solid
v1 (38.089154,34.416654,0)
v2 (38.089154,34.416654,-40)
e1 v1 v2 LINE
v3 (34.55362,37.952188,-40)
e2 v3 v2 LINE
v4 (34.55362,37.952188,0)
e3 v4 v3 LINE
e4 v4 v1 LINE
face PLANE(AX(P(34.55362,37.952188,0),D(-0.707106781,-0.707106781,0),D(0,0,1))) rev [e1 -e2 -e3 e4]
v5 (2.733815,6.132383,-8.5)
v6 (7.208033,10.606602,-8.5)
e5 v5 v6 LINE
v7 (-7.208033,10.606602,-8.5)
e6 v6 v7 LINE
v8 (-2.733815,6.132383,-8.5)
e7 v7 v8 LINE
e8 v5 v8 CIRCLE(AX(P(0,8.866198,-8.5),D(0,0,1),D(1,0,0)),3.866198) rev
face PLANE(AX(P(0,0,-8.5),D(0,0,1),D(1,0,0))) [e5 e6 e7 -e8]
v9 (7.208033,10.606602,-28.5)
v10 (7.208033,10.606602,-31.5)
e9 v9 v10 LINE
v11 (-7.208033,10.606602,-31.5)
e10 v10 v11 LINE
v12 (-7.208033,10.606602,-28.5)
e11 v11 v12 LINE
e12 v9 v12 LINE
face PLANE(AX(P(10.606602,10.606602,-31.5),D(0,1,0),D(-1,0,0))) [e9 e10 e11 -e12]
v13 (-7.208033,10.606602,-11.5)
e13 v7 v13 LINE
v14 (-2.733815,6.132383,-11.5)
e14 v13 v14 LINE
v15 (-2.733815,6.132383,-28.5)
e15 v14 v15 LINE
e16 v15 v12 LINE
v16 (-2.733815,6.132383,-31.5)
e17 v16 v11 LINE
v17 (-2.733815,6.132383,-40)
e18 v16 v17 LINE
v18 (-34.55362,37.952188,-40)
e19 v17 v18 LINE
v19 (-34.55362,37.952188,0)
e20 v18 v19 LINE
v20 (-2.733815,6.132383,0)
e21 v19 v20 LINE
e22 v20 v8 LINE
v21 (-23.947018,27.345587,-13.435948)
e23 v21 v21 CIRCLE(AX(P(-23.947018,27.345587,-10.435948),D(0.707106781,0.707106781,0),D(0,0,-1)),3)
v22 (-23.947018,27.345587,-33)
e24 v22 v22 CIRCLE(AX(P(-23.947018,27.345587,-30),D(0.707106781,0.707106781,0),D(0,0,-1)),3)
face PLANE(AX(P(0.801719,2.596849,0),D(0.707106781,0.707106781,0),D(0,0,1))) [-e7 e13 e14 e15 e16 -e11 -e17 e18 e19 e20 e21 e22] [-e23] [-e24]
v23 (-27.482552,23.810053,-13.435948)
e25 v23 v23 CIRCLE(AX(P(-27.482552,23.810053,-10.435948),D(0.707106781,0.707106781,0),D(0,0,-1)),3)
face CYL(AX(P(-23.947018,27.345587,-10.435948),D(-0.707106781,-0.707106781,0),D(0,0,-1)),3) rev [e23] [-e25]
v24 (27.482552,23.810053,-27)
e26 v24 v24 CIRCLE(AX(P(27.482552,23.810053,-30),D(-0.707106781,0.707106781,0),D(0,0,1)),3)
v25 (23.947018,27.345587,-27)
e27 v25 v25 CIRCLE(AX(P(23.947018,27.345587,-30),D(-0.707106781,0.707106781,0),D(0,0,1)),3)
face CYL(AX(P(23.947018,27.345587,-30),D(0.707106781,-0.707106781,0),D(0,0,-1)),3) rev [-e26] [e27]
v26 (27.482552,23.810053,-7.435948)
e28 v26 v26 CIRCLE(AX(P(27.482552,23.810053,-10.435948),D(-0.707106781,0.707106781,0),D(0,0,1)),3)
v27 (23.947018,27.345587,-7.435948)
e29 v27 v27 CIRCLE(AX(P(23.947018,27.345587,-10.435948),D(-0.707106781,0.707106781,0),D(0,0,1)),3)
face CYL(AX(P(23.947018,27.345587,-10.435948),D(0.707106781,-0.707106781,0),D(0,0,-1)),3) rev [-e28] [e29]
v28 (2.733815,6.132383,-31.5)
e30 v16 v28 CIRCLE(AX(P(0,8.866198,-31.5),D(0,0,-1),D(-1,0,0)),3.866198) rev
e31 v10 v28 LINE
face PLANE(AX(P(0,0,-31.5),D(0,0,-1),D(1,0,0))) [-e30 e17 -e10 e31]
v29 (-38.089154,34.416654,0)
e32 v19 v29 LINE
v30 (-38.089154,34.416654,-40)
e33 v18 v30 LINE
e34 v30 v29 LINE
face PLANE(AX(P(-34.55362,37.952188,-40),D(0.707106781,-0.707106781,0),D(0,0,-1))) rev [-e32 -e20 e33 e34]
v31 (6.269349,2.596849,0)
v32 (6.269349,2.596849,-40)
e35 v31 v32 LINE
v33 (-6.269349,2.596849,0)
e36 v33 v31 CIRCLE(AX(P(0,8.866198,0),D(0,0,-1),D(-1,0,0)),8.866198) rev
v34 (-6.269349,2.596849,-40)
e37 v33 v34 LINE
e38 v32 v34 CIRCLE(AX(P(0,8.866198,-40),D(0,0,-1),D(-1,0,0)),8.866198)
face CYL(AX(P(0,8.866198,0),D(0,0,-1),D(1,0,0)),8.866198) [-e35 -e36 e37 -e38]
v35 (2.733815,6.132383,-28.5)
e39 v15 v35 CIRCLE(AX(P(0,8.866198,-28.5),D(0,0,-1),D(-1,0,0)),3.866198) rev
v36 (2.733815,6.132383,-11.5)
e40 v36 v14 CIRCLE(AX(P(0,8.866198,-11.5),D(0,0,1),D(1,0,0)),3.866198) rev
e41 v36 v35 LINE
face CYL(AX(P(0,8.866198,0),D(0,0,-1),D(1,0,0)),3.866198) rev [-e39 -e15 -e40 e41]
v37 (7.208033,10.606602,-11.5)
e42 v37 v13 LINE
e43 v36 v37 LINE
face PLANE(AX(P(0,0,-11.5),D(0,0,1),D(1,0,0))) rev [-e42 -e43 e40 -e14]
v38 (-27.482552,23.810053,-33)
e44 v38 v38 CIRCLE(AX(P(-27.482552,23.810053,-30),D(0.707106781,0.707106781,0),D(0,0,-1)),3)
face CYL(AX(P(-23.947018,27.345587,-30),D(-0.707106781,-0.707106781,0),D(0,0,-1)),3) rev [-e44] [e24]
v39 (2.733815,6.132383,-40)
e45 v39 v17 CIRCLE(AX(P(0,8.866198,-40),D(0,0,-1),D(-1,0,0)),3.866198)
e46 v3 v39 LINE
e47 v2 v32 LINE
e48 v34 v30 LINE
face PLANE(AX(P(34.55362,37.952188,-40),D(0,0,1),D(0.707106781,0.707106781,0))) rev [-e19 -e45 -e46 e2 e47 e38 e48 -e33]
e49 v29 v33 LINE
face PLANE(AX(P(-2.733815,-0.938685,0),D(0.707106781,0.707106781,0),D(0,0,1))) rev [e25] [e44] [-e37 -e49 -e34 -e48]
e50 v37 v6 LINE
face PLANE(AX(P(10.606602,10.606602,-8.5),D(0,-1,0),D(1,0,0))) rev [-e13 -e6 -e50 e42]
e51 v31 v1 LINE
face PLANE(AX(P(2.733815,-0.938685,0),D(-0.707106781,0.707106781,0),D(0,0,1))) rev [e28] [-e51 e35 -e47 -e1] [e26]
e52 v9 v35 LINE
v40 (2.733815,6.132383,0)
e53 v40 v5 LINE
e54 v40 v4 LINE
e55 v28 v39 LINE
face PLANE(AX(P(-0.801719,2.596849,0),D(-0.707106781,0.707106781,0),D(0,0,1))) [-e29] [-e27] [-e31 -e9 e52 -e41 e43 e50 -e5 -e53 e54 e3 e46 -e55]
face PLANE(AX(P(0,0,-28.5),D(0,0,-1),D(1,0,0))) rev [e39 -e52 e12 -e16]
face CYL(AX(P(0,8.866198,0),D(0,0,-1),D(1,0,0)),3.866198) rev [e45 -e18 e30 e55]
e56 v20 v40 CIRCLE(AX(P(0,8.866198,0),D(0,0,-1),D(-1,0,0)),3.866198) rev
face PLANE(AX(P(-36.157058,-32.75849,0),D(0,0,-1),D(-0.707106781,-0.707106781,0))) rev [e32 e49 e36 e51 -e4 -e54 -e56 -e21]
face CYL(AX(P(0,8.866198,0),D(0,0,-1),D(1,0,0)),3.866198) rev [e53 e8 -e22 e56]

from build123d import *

# Parameters (mm, degrees)
SKETCH3_W           = 100
SKETCH3_H           = 40
SKETCH3_R           = 3
BOSS_EXTRUDE1_DEPTH = 5
FLEX1_START         = -36
FLEX1_OUTLINE_W     = 48.866197724
FLEX1_OUTLINE_H     = 40
FLEX1_DEPTH         = 33.40315081
FLEX1_START_2       = -2.59684919
FLEX1_2_OUTLINE_W   = 48.866197724
FLEX1_2_OUTLINE_H   = 40
FLEX1_2_OUTLINE_R   = 3
FLEX1_2_DEPTH       = 8.866197724
FLEX1_START_3       = 2.448182419
FLEX1_3_OUTLINE_W   = 5
FLEX1_3_OUTLINE_H   = 40
FLEX1_3_DEPTH       = 48.821166115
FLEX1_START_4       = -51.269348534
FLEX1_4_OUTLINE_W   = 3.866197724
FLEX1_4_OUTLINE_H   = 40
FLEX1_4_DEPTH       = 45
FLEX1_START_5       = 2.59684919
FLEX1_5_OUTLINE_R   = 3
FLEX1_5_OUTLINE_W   = 3.821166115
FLEX1_5_OUTLINE_H   = 40
FLEX1_5_DEPTH       = 33.40315081
FLEX1_START_6       = -2.40315081
FLEX1_6_OUTLINE_R   = 3
FLEX1_6_DEPTH       = 5
FLEX1_START_7       = 1.935784603
FLEX1_7_OUTLINE_W   = 0.045031609
FLEX1_7_OUTLINE_H   = 40
FLEX1_7_DEPTH       = 0.545856358
FLEX1_START_8       = -40
FLEX1_8_DEPTH       = 40
BOSS_EXTRUDE2_DEPTH = 1.5


with BuildPart() as part:
    # Sketch3 → Boss-Extrude1 (new body)
    with BuildSketch(Plane(origin=(0, 0, 0), x_dir=(1, 0, 0), z_dir=(0, 1, 0))):
        with Locations((0, 20)):
            Rectangle(SKETCH3_W, SKETCH3_H)
        with Locations(Location((35, 30, 0), (0, 0, 270))):
            Circle(SKETCH3_R, mode=Mode.SUBTRACT)
        with Locations(Location((35, 10.435948304, 0), (0, 0, 270))):
            Circle(SKETCH3_R, mode=Mode.SUBTRACT)
        with Locations(Location((-35, 10.435948304, 0), (0, 0, 90))):
            Circle(SKETCH3_R, mode=Mode.SUBTRACT)
        with Locations(Location((-35, 30, 0), (0, 0, 90))):
            Circle(SKETCH3_R, mode=Mode.SUBTRACT)
    extrude(amount=BOSS_EXTRUDE1_DEPTH)

    # Flex1: read off the stored shape, not the designer's step
    # Flex1 outline → Flex1 (cut)
    with BuildSketch(Plane(origin=(0, 0, 0), x_dir=(0.707106781186546, -0.707106781186549, 0), z_dir=(0.707106781186549, 0.707106781186546, 0)).offset(FLEX1_START)):
        with Locations((-26.836249672, 20)):
            Rectangle(FLEX1_OUTLINE_W, FLEX1_OUTLINE_H)
    extrude(amount=FLEX1_DEPTH, mode=Mode.SUBTRACT)

    # Flex1 2 outline → Flex1 2 (add)
    with BuildSketch(Plane(origin=(0, 0, 0), x_dir=(0.707106781186546, -0.707106781186549, 0), z_dir=(0.707106781186549, 0.707106781186546, 0)).offset(FLEX1_START_2)):
        with Locations((-26.836249672, 20)):
            Rectangle(FLEX1_2_OUTLINE_W, FLEX1_2_OUTLINE_H)
        with Locations((-36.269348534, 10.435948304)):
            Circle(FLEX1_2_OUTLINE_R, mode=Mode.SUBTRACT)
        with Locations((-36.269348534, 30)):
            Circle(FLEX1_2_OUTLINE_R, mode=Mode.SUBTRACT)
    extrude(amount=FLEX1_2_DEPTH)

    # Flex1 3 outline → Flex1 3 (add)
    with BuildSketch(Plane(origin=(0, 0, 0), x_dir=(0.707106781186546, -0.707106781186549, 0), z_dir=(0.707106781186549, 0.707106781186546, 0)).offset(FLEX1_START_3)):
        with Locations((0.09684919, 20)):
            Rectangle(FLEX1_3_OUTLINE_W, FLEX1_3_OUTLINE_H)
    extrude(amount=FLEX1_3_DEPTH)

    # Flex1 4 outline → Flex1 4 (cut)
    with BuildSketch(Plane(origin=(0, 0, 0), x_dir=(0.707106781186546, 0.707106781186549, 0), z_dir=(0.707106781186549, -0.707106781186546, 0)).offset(FLEX1_START_4)):
        with Locations((4.336249672, -20)):
            Rectangle(FLEX1_4_OUTLINE_W, FLEX1_4_OUTLINE_H)
    extrude(amount=FLEX1_4_DEPTH, mode=Mode.SUBTRACT)

    # Flex1 5 outline → Flex1 5 (cut)
    with BuildSketch(Plane(origin=(0, 0, 0), x_dir=(0.707106781186546, 0.707106781186549, 0), z_dir=(0.707106781186549, -0.707106781186546, 0)).offset(FLEX1_START_5)):
        with Locations((36.269348534, -10.435948304)):
            Circle(FLEX1_5_OUTLINE_R)
        with Locations((36.269348534, -30)):
            Circle(FLEX1_5_OUTLINE_R)
        with Locations((4.358765477, -20)):
            Rectangle(FLEX1_5_OUTLINE_W, FLEX1_5_OUTLINE_H)
    extrude(amount=FLEX1_5_DEPTH, mode=Mode.SUBTRACT)

    # Flex1 6 outline → Flex1 6 (cut)
    with BuildSketch(Plane(origin=(0, 0, 0), x_dir=(0.707106781186546, 0.707106781186549, 0), z_dir=(0.707106781186549, -0.707106781186546, 0)).offset(FLEX1_START_6)):
        with Locations((36.269348534, -10.435948304)):
            Circle(FLEX1_6_OUTLINE_R)
        with Locations((36.269348534, -30)):
            Circle(FLEX1_6_OUTLINE_R)
    extrude(amount=FLEX1_6_DEPTH, mode=Mode.SUBTRACT)

    # Flex1 7 outline → Flex1 7 (cut)
    with BuildSketch(Plane(origin=(0, 0, 0), x_dir=(0.707106781186546, 0.707106781186549, 0), z_dir=(0.707106781186549, -0.707106781186546, 0)).offset(FLEX1_START_7)):
        with Locations((2.425666614, -20)):
            Rectangle(FLEX1_7_OUTLINE_W, FLEX1_7_OUTLINE_H)
    extrude(amount=FLEX1_7_DEPTH, mode=Mode.SUBTRACT)

    # Flex1 8 outline → Flex1 8 (cut)
    with BuildSketch(Plane.XY.offset(FLEX1_START_8)):
        with BuildLine():
            ThreePointArc((-2.733814628, 6.132383096), (0, 5), (2.733814628, 6.132383096))
            Line((2.733814628, 6.132383096), (0, 8.866197724))
            Line((0, 8.866197724), (-2.733814628, 6.132383096))
        make_face()
        with BuildLine():
            Line((3.567376062, -0.105123282), (6.269348534, 2.59684919))
            ThreePointArc((6.269348534, 2.59684919), (3.392946977, 0.674899116), (0, 0))
            Line((0, 0), (3.398568468, 0))
            Line((3.398568468, 0), (3.068090654, 0.330477814))
            Line((3.068090654, 0.330477814), (3.09993281, 0.36231997))
            Line((3.09993281, 0.36231997), (3.567376062, -0.105123282))
        make_face()
        with BuildLine():
            Line((-3.398568468, 0), (0, 0))
            ThreePointArc((0, 0), (-3.392946977, 0.674899116), (-6.269348534, 2.59684919))
            Line((-6.269348534, 2.59684919), (-3.535533906, -0.136965438))
            Line((-3.535533906, -0.136965438), (-3.398568468, 0))
        make_face()
        Polygon((8.672499344, 5), (6.269348534, 2.59684919), (8.866197724, 0), (50, 0), (50, 5), align=None)
    extrude(amount=FLEX1_8_DEPTH, mode=Mode.SUBTRACT)

    # Sketch4 → Boss-Extrude2 (add, symmetric)
    with BuildSketch(Plane.XY.offset(-10)):
        Polygon((0, 0), (10.606601718, 10.606601718), (-10.606601718, 10.606601718), align=None)
    boss_extrude2 = extrude(amount=BOSS_EXTRUDE2_DEPTH, both=True)

    # Mirror1: Boss-Extrude2 across plane
    add(boss_extrude2.mirror(Plane.XY.offset(-20)))


solid = part.part
